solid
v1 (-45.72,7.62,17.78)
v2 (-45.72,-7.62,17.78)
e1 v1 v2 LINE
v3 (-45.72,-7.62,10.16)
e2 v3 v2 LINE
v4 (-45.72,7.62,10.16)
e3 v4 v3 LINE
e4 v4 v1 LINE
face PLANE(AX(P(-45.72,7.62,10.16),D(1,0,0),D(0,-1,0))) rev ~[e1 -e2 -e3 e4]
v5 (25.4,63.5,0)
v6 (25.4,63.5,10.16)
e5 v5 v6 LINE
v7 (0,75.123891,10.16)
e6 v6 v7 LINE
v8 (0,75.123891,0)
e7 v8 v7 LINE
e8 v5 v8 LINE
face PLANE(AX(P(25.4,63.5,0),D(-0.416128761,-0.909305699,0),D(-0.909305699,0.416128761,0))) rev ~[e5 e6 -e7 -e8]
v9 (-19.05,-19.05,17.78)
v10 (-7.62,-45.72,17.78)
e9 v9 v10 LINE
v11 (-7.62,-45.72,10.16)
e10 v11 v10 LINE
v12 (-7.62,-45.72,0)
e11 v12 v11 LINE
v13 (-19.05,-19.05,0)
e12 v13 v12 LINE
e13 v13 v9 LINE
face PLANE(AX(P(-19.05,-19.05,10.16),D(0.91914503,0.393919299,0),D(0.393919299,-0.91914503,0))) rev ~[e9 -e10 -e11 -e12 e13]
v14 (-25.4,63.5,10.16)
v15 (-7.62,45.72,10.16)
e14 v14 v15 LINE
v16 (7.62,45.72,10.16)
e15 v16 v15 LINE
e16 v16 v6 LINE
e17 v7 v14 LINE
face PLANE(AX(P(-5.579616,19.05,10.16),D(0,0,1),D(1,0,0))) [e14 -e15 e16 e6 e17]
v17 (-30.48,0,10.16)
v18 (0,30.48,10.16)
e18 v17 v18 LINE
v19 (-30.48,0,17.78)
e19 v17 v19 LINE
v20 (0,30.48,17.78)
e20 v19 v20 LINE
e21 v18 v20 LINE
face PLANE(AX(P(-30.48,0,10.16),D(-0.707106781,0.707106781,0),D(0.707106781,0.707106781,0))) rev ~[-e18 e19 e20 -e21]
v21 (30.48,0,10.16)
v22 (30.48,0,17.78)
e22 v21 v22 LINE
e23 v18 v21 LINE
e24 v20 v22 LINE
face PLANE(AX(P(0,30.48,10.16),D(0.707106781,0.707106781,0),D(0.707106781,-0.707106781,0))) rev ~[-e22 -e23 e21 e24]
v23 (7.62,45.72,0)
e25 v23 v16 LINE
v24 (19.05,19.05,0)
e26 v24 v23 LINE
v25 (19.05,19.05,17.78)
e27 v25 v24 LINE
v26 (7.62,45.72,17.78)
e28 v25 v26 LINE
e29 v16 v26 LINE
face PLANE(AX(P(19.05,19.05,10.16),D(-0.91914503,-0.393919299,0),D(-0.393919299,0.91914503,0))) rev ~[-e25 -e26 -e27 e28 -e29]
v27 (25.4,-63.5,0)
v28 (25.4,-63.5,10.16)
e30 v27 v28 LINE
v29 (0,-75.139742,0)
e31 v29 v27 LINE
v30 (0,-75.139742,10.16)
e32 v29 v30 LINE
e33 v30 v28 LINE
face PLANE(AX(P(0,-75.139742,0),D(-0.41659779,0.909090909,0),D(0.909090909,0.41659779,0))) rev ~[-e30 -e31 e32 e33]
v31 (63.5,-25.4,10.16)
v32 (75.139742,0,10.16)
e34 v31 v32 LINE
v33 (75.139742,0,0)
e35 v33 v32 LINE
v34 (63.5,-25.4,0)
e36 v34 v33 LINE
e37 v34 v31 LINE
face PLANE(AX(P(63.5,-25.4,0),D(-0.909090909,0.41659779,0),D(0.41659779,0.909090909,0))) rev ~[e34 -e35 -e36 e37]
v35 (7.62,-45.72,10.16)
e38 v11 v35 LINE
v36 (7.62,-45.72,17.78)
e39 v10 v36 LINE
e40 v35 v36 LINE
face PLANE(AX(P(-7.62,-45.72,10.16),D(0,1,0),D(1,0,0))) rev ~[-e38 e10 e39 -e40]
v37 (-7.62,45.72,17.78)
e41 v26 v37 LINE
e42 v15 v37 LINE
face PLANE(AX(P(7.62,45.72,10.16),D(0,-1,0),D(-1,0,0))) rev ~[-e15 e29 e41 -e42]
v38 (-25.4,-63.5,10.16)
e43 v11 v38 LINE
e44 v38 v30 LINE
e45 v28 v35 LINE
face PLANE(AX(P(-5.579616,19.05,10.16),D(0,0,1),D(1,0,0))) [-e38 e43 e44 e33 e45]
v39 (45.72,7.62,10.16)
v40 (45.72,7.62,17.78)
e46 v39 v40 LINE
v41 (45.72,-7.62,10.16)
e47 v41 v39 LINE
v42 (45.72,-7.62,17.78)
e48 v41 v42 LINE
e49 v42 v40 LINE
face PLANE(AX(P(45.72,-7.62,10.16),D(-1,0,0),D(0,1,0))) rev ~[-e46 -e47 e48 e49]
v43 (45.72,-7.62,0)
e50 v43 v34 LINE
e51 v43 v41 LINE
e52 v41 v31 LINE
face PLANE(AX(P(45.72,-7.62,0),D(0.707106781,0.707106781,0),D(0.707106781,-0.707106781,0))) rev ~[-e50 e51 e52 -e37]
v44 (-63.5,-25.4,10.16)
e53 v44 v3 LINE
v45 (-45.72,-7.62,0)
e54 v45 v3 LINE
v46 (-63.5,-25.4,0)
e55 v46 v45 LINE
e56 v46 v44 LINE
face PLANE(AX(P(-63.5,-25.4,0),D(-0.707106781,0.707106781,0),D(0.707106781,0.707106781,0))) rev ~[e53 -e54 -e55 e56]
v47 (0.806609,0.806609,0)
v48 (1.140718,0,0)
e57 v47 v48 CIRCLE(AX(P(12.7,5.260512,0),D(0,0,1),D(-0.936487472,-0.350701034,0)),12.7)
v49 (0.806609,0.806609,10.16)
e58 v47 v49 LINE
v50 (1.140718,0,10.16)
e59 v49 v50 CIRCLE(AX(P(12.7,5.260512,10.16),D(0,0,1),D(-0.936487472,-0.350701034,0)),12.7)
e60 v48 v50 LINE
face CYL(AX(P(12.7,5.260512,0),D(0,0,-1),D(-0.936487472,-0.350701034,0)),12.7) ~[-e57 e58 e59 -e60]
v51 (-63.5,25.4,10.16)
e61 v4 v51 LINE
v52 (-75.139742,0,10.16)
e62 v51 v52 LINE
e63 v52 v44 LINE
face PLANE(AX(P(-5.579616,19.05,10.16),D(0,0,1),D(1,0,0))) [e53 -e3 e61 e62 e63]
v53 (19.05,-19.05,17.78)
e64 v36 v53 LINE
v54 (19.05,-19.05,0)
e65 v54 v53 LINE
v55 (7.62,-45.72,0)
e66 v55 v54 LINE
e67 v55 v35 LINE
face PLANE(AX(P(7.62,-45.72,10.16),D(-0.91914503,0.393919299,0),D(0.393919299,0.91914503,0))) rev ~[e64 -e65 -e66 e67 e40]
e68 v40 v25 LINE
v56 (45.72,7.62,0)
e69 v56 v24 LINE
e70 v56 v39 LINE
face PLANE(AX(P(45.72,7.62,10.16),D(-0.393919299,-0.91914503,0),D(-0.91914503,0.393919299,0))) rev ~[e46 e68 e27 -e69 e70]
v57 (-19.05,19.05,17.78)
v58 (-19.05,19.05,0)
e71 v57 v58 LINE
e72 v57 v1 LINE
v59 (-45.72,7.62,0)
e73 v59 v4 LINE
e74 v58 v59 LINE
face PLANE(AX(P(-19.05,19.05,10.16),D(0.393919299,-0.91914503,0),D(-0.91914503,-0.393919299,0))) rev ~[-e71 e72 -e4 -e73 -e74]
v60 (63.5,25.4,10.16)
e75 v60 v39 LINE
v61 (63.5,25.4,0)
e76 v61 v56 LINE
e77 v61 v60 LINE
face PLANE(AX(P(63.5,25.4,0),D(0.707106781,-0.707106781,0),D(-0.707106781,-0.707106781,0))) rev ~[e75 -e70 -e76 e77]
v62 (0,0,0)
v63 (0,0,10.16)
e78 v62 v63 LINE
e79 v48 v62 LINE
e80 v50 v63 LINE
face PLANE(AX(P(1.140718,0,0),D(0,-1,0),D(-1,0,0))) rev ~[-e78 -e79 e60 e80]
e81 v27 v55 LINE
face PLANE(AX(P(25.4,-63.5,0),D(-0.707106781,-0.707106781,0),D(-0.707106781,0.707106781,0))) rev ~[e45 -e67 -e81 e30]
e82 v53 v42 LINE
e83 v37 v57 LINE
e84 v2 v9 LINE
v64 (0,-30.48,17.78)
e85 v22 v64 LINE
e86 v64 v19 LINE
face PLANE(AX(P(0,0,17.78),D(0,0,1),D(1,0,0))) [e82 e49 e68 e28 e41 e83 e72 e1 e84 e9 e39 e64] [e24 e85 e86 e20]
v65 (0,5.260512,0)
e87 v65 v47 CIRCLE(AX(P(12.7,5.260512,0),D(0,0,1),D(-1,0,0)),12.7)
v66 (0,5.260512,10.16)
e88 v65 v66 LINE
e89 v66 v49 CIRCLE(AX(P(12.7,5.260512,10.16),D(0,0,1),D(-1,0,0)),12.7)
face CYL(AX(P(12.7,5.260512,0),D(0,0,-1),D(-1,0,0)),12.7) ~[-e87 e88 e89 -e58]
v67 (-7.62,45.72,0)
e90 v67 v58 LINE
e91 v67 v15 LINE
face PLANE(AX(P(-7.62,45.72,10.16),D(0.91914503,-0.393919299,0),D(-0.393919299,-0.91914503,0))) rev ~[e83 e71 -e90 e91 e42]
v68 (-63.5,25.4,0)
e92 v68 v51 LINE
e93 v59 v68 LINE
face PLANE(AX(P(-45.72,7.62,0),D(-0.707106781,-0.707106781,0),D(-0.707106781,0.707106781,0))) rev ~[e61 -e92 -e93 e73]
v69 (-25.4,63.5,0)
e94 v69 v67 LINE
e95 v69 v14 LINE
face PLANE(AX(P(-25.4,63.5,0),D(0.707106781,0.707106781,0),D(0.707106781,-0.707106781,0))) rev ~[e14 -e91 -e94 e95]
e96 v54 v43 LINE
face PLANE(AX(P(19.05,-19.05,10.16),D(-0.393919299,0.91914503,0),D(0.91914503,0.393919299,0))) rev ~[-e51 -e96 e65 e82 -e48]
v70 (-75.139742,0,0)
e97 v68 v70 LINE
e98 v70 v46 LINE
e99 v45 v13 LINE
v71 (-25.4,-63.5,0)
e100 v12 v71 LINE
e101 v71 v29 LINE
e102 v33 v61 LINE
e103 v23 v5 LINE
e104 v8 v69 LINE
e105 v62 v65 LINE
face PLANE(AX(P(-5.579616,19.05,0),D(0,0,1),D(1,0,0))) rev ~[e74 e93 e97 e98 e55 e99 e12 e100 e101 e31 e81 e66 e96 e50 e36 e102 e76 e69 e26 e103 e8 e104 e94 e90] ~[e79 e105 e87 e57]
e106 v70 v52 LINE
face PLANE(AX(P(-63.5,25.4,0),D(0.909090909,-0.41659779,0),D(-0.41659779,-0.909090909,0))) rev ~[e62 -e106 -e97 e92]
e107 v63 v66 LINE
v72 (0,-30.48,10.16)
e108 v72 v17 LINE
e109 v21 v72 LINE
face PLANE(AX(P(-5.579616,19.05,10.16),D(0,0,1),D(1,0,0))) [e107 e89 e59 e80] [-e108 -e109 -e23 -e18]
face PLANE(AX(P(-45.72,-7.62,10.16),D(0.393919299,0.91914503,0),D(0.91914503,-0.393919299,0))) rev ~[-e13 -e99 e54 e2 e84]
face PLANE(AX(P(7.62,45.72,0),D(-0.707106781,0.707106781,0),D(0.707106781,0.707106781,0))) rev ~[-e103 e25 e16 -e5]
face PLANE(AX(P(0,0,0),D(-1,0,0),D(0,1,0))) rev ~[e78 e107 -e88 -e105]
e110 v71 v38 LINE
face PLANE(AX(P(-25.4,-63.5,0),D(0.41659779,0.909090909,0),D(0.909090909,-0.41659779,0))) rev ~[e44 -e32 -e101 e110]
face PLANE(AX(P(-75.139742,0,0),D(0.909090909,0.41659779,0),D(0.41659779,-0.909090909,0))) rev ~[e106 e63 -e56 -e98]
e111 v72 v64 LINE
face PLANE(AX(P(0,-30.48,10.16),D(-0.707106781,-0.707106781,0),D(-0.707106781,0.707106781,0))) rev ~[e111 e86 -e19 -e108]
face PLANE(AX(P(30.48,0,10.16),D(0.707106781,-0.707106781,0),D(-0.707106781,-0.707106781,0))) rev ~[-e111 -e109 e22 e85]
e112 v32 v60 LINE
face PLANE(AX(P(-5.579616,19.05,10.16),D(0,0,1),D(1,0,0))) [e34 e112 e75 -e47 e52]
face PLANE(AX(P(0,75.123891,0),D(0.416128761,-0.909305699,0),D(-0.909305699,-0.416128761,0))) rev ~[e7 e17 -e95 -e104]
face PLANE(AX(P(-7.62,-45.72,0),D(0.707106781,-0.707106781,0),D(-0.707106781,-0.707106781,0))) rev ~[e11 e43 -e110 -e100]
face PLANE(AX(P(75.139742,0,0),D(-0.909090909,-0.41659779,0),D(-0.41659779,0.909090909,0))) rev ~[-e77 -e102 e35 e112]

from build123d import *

# Parameters (mm, degrees)
F1_DEPTH = 10.16
F3_DEPTH = 7.62


# Not quite as in the source:
# - a feature names something its author has since deleted; it is built from what else it names


with BuildPart() as f1:
    # F0 (on Top) → F1 (new body)
    with BuildSketch(Plane.XY):
        Polygon((-19.05, 19.05), (0, 0), (0, 5.2605122421), (0, 38.1), align=None)
        with BuildLine():
            Line((1.1407175417, 0), (0, 0))
            Line((0, 0), (0, -38.1))
            Line((0, -38.1), (19.05, -19.05))
            Line((19.05, -19.05), (3.7197438789, -3.7197438789))
            ThreePointArc((3.7197438789, -3.7197438789), (2.263176494, -1.9756963719), (1.1407175417, 0))
        make_face()
        Polygon((-19.05, -19.05), (0, 0), (-38.1, 0), align=None)
        Polygon((-38.1, 0), (0, 0), (-19.05, 19.05), align=None)
        Polygon((0, -38.1), (0, 0), (-19.05, -19.05), align=None)
        with BuildLine():
            Line((0, 38.1), (0, 5.2605122421))
            ThreePointArc((0, 5.2605122421), (0.2032791438, 2.9973357481), (0.8066091092, 0.8066091092))
            Line((0.8066091092, 0.8066091092), (19.05, 19.05))
            Line((19.05, 19.05), (0, 38.1))
        make_face()
        with BuildLine():
            ThreePointArc((0.8066091092, 0.8066091092), (0.9667299371, 0.4004326511), (1.1407175417, 0))
            Line((1.1407175417, 0), (38.1, 0))
            Line((38.1, 0), (19.05, 19.05))
            Line((19.05, 19.05), (0.8066091092, 0.8066091092))
        make_face()
        with BuildLine():
            Line((38.1, 0), (1.1407175417, 0))
            ThreePointArc((1.1407175417, 0), (2.263176494, -1.9756963719), (3.7197438789, -3.7197438789))
            Line((3.7197438789, -3.7197438789), (19.05, -19.05))
            Line((19.05, -19.05), (38.1, 0))
        make_face()
        Polygon((7.62, -45.72), (0, -38.1), (0, -63.5), align=None)
        Polygon((-7.62, -45.72), (0, -38.1), (-19.05, -19.05), align=None)
        Polygon((19.05, -19.05), (0, -38.1), (7.62, -45.72), align=None)
        Polygon((0, -63.5), (0, -38.1), (-7.62, -45.72), align=None)
        Polygon((-45.72, -7.62), (-38.1, 0), (-63.5, 0), align=None)
        Polygon((-45.72, 7.62), (-38.1, 0), (-19.05, 19.05), align=None)
        Polygon((-63.5, 0), (-38.1, 0), (-45.72, 7.62), align=None)
        Polygon((-19.05, -19.05), (-38.1, 0), (-45.72, -7.62), align=None)
        Polygon((-7.62, 45.72), (-19.05, 19.05), (0, 38.1), align=None)
        Polygon((-7.62, 45.72), (0, 38.1), (0, 63.5), align=None)
        Polygon((7.62, 45.72), (0, 38.1), (19.05, 19.05), align=None)
        Polygon((0, 63.5), (0, 38.1), (7.62, 45.72), align=None)
        Polygon((45.72, 7.62), (38.1, 0), (63.5, 0), align=None)
        Polygon((45.72, -7.62), (38.1, 0), (19.05, -19.05), align=None)
        Polygon((19.05, 19.05), (38.1, 0), (45.72, 7.62), align=None)
        Polygon((63.5, 0), (38.1, 0), (45.72, -7.62), align=None)
        Polygon((7.62, -45.72), (0, -63.5), (-7.62, -45.72), (-25.4, -63.5), (0, -75.1397422652), (25.4, -63.5), align=None)
        Polygon((-45.72, -7.62), (-63.5, 0), (-45.72, 7.62), (-63.5, 25.4), (-75.1397422652, 0), (-63.5, -25.4), align=None)
        Polygon((-25.4, 63.5), (-7.62, 45.72), (0, 63.5), (7.62, 45.72), (25.4, 63.5), (0, 75.1238912344), align=None)
        Polygon((45.72, 7.62), (63.5, 0), (45.72, -7.62), (63.5, -25.4), (75.1397422652, 0), (63.5, 25.4), align=None)
    extrude(amount=F1_DEPTH)

    # F2 (on face) → F3 (join)
    with BuildSketch(Plane.XY.offset(10.16)):
        Polygon((-19.05, 19.05), (-45.72, 7.62), (-45.72, -7.62), (-19.05, -19.05), (-7.62, -45.72), (7.62, -45.72), (19.05, -19.05), (45.72, -7.62), (45.72, 7.62), (19.05, 19.05), (7.62, 45.72), (-7.62, 45.72), align=None)
        Polygon((0, -30.48), (-30.48, 0), (0, 30.48), (30.48, 0), align=None, mode=Mode.SUBTRACT)
    extrude(amount=F3_DEPTH)


solid = f1.part
